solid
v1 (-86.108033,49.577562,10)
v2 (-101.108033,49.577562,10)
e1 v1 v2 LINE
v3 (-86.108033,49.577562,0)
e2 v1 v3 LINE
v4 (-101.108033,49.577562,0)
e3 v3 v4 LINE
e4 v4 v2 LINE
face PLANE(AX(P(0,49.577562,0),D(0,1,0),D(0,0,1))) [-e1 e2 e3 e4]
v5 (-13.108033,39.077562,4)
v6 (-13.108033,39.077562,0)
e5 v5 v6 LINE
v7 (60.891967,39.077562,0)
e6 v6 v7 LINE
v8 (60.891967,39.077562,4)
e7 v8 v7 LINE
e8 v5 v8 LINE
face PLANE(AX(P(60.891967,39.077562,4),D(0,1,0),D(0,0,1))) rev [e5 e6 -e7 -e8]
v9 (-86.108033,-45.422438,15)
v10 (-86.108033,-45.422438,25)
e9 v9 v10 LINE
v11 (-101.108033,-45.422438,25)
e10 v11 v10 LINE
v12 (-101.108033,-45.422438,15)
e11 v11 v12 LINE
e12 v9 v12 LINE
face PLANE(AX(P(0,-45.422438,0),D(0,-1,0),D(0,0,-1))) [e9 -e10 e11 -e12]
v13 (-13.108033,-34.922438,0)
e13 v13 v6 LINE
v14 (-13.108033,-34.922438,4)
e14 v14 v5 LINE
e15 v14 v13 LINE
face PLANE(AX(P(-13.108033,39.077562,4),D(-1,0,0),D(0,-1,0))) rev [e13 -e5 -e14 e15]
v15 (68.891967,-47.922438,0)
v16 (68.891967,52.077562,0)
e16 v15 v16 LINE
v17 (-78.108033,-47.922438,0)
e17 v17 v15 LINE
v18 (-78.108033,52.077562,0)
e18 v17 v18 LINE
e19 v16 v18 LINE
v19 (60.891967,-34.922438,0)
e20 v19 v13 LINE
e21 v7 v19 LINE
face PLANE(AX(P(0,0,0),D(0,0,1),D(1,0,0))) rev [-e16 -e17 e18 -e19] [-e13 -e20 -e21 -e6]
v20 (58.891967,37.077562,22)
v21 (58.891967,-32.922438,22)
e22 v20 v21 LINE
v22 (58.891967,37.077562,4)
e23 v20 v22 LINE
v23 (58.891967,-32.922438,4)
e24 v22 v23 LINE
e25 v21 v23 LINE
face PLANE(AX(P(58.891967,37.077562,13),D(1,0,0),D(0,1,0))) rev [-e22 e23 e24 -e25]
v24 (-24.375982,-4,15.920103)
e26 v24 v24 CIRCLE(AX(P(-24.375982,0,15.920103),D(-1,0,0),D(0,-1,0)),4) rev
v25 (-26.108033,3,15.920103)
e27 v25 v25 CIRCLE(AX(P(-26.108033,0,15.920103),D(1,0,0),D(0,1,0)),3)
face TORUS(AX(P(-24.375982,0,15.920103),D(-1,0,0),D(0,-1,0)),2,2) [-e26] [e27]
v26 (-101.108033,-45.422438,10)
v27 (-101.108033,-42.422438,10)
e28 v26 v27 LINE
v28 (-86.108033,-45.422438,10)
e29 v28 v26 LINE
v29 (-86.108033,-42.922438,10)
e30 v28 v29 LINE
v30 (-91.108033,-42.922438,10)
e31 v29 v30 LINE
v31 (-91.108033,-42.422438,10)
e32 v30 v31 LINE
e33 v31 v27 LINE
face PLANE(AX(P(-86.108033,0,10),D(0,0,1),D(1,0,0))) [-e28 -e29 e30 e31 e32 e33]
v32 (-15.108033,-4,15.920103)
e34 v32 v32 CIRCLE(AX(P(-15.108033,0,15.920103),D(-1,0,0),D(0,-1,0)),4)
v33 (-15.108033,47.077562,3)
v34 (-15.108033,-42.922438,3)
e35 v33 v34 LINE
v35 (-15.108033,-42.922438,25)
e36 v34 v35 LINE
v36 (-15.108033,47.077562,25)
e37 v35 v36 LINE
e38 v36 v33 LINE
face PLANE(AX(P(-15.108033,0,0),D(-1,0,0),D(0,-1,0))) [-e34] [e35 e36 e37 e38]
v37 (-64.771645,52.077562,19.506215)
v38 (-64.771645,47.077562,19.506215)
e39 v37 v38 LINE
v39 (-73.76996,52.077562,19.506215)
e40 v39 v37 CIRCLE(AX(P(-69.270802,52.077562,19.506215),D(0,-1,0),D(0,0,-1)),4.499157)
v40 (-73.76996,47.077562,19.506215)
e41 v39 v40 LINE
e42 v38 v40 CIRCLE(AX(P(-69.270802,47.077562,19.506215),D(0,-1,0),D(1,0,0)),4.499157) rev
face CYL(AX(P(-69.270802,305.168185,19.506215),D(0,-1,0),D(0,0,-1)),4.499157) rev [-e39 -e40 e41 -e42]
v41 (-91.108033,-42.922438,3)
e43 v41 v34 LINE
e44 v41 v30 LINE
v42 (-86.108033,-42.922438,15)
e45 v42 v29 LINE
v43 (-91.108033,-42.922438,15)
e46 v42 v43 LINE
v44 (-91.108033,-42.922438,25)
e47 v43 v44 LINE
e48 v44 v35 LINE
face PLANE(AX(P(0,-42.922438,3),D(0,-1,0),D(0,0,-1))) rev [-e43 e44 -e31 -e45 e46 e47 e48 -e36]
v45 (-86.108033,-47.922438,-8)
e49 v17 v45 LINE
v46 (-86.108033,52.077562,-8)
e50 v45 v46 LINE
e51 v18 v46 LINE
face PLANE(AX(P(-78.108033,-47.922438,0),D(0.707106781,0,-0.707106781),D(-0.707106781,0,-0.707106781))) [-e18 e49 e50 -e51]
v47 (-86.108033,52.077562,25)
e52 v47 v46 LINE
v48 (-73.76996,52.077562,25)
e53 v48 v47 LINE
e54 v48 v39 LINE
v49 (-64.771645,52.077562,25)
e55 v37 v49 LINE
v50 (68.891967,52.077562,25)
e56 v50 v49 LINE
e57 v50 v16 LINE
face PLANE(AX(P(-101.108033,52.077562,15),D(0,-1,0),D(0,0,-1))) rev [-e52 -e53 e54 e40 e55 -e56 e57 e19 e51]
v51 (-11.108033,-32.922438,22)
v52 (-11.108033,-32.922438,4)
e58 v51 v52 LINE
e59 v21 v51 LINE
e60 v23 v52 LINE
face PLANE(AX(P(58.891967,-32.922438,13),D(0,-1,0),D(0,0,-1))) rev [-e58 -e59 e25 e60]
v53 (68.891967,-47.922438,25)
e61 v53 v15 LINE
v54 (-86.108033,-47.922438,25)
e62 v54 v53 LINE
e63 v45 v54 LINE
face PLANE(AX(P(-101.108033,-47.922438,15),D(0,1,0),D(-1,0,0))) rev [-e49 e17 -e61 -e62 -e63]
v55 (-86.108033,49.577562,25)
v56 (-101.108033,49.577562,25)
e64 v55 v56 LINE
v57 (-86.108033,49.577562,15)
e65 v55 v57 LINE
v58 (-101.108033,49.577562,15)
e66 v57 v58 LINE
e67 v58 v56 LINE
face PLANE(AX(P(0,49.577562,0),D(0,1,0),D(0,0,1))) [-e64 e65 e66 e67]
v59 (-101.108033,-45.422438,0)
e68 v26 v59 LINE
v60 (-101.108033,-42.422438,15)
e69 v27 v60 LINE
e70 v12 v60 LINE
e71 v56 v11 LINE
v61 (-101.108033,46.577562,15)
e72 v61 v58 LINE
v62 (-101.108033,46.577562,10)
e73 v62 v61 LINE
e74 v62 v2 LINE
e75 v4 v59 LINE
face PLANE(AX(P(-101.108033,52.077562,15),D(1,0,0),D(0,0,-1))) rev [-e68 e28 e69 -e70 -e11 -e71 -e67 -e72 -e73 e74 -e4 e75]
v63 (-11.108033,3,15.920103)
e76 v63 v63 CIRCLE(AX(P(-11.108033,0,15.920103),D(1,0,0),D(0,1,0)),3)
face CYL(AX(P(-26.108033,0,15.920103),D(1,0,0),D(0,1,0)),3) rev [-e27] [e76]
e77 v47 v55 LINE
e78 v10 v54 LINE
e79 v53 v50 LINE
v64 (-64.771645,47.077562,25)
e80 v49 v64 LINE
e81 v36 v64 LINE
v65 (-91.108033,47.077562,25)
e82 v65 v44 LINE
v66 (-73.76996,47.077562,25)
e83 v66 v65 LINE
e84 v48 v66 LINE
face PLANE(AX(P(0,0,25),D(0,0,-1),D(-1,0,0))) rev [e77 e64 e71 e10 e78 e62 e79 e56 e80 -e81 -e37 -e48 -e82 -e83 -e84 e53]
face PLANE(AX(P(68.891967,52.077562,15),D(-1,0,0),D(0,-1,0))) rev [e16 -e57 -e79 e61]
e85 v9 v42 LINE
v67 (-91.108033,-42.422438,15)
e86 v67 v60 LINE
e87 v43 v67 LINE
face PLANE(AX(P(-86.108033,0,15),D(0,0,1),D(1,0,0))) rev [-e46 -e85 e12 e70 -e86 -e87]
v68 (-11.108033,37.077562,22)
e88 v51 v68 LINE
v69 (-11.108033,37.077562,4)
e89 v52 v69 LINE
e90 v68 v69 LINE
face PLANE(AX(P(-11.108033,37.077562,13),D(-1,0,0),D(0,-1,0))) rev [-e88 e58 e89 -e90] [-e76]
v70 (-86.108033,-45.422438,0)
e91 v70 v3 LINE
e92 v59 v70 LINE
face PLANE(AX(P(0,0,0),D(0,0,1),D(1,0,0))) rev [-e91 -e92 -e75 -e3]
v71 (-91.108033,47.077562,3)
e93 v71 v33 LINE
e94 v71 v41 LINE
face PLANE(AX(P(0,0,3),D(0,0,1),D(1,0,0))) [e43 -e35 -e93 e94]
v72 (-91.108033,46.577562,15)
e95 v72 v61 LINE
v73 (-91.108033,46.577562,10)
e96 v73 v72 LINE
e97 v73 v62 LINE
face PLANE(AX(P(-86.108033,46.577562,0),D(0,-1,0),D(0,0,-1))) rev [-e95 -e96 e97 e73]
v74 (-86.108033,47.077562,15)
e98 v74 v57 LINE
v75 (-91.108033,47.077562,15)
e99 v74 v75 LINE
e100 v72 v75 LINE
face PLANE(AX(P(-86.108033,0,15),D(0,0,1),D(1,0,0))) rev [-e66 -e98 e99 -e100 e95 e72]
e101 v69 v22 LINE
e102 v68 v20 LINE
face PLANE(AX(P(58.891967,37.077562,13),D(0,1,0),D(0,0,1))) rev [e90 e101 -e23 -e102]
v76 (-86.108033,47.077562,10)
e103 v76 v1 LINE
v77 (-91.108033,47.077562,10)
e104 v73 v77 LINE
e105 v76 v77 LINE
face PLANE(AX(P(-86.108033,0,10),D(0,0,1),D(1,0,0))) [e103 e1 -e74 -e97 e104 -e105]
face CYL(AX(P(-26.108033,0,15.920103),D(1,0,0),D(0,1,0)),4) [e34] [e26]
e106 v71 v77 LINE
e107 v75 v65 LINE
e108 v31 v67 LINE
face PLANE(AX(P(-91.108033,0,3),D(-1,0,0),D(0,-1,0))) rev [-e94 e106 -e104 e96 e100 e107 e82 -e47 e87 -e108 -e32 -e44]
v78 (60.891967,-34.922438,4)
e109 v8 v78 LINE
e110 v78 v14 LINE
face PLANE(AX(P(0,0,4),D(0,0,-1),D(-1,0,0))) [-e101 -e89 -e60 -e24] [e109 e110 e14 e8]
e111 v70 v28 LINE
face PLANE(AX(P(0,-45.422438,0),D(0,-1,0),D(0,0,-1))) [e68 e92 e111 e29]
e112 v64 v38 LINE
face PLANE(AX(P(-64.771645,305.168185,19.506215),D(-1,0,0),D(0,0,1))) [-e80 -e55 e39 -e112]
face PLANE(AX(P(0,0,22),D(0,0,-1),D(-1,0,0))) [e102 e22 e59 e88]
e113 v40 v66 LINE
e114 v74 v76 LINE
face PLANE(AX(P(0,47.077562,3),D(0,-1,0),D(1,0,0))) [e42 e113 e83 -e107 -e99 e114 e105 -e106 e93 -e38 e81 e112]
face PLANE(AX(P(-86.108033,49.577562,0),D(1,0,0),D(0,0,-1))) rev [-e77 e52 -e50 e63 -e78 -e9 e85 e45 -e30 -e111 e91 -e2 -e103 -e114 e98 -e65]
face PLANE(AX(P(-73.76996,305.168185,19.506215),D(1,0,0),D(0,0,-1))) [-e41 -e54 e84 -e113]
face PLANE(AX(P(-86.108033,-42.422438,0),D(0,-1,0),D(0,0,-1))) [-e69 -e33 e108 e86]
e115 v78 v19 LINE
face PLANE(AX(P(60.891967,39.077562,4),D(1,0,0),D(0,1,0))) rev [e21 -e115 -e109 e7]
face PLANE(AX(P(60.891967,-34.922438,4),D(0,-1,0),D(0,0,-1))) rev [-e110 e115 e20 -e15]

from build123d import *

# Parameters (mm, degrees)
SKETCH1_W                = 170
SKETCH1_H                = 100
BOSS_EXTRUDE1_DEPTH      = 15
SKETCH2_W                = 70
SKETCH2_H                = 70
CUT_EXTRUDE1_DEPTH       = 13
SKETCH3_W                = 70
SKETCH3_H                = 90
CUT_EXTRUDE2_DEPTH       = 12
SKETCH8_W                = 15
SKETCH8_H                = 15
CUT_EXTRUDE9_DEPTH       = 2.5
SKETCH9_W                = 15
SKETCH9_H                = 15
CUT_EXTRUDE10_DEPTH      = 2.5
SKETCH10_W               = 12
SKETCH10_H               = 90
CUT_EXTRUDE11_DEPTH      = 10
SKETCH11_W               = 80
SKETCH11_H               = 90
BOSS_EXTRUDE2_DEPTH      = 10
SKETCH12_W               = 22
SKETCH12_H               = 90
BOSS_EXTRUDE4_DEPTH      = 4
SKETCH2_2_W              = 70
SKETCH2_2_H              = 70
CUT_EXTRUDE12_DEPTH      = 22
SKETCH13_W               = 74
SKETCH13_H               = 74
SKETCH13_W_2             = 70
SKETCH13_H_2             = 70
CUT_EXTRUDE13_DEPTH      = 4
BOSS_EXTRUDE6_DEPTH      = 100
SKETCH15_W               = 5
SKETCH15_H               = 3
CUT_EXTRUDE14_DEPTH      = 15
SKETCH16_R               = 4
SKETCH16_R_2             = 3
BOSS_EXTRUDE7_DEPTH      = 15
SKETCH16_3_R             = 3
CUT_EXTRUDE15_DEPTH      = 15
FILLET1_R                = 2
CUT_EXTRUDE16_DEPTH      = 145.387791679
CUT_EXTRUDE16_DEPTH_BACK = 15


with BuildPart() as part:
    # Sketch1 → Boss-Extrude1 (new body)
    with BuildSketch(Plane.XY):
        with Locations((-16.108033241, 2.077562327)):
            Rectangle(SKETCH1_W, SKETCH1_H)
    extrude(amount=BOSS_EXTRUDE1_DEPTH)

    # Sketch2 → Cut-Extrude1 (cut)
    with BuildSketch(Plane(origin=(0, 0, 0), x_dir=(-1, 0, 0), z_dir=(0, 0, -1))):
        with Locations((-23.891966759, 2.077562327)):
            Rectangle(SKETCH2_W, SKETCH2_H)
    extrude(amount=-CUT_EXTRUDE1_DEPTH, mode=Mode.SUBTRACT)

    # Sketch3 → Cut-Extrude2 (cut)
    with BuildSketch(Plane.XY.offset(15)):
        with Locations((-56.108033241, 2.077562327)):
            Rectangle(SKETCH3_W, SKETCH3_H)
    extrude(amount=-CUT_EXTRUDE2_DEPTH, mode=Mode.SUBTRACT)

    # Sketch8 → Cut-Extrude9 (cut)
    with BuildSketch(Plane(origin=(0, 52.077562327, 0), x_dir=(1, 0, 0), z_dir=(0, 1, 0))):
        with Locations((-93.608033241, -7.5)):
            Rectangle(SKETCH8_W, SKETCH8_H)
    extrude(amount=-CUT_EXTRUDE9_DEPTH, mode=Mode.SUBTRACT)

    # Sketch9 → Cut-Extrude10 (cut)
    with BuildSketch(Plane.XZ.offset(47.922437673)):
        with Locations((-93.608033241, 7.5)):
            Rectangle(SKETCH9_W, SKETCH9_H)
    extrude(amount=-CUT_EXTRUDE10_DEPTH, mode=Mode.SUBTRACT)

    # Sketch10 → Cut-Extrude11 (cut)
    with BuildSketch(Plane.ZY.offset(21.108033241)):
        with Locations((9, 2.077562327)):
            Rectangle(SKETCH10_W, SKETCH10_H)
    extrude(amount=-CUT_EXTRUDE11_DEPTH, mode=Mode.SUBTRACT)

    # Sketch11 → Boss-Extrude2 (add)
    with BuildSketch(Plane.XY.offset(15)):
        Polygon((-86.108033241, -45.422437673), (-86.108033241, -47.922437673), (68.891966759, -47.922437673), (68.891966759, 52.077562327), (-86.108033241, 52.077562327), (-86.108033241, 49.577562327), (-101.108033241, 49.577562327), (-101.108033241, -45.422437673), align=None)
        with Locations((-51.108033241, 2.077562327)):
            Rectangle(SKETCH11_W, SKETCH11_H, mode=Mode.SUBTRACT)
    extrude(amount=BOSS_EXTRUDE2_DEPTH)

    # Sketch12 → Boss-Extrude4 (add)
    with BuildSketch(Plane.ZY.offset(11.108033241)):
        with Locations((14, 2.077562327)):
            Rectangle(SKETCH12_W, SKETCH12_H)
    extrude(amount=BOSS_EXTRUDE4_DEPTH)

    # Sketch2<2> → Cut-Extrude12 (cut)
    with BuildSketch(Plane(origin=(0, 0, 0), x_dir=(-1, 0, 0), z_dir=(0, 0, -1))):
        with Locations((-23.891966759, 2.077562327)):
            Rectangle(SKETCH2_2_W, SKETCH2_2_H)
    extrude(amount=-CUT_EXTRUDE12_DEPTH, mode=Mode.SUBTRACT)

    # Sketch13 → Cut-Extrude13 (cut)
    with BuildSketch(Plane(origin=(0, 0, 0), x_dir=(-1, 0, 0), z_dir=(0, 0, -1))):
        with Locations((-23.891966759, 2.077562327)):
            Rectangle(SKETCH13_W, SKETCH13_H)
        with Locations((-23.891966759, 2.077562327)):
            Rectangle(SKETCH13_W_2, SKETCH13_H_2, mode=Mode.SUBTRACT)
    extrude(amount=-CUT_EXTRUDE13_DEPTH, mode=Mode.SUBTRACT)

    # Sketch14 → Boss-Extrude6 (add)
    with BuildSketch(Plane(origin=(0, 52.077562327, 0), x_dir=(1, 0, 0), z_dir=(0, 1, 0))):
        Polygon((-86.108033241, 0), (-78.108033241, 0), (-86.108033241, 8), align=None)
    extrude(amount=-BOSS_EXTRUDE6_DEPTH)

    # Sketch15 → Cut-Extrude14 (cut)
    with BuildSketch(Plane.ZY.offset(101.108033241)):
        with Locations((12.5, 48.077562327)):
            Rectangle(SKETCH15_W, SKETCH15_H)
        with Locations((12.5, -43.922437673)):
            Rectangle(SKETCH15_W, SKETCH15_H)
    extrude(amount=-CUT_EXTRUDE14_DEPTH, mode=Mode.SUBTRACT)

    # Sketch16 → Boss-Extrude7 (add)
    with BuildSketch(Plane(origin=(-11.108033241, 0, 0), x_dir=(0, 0, -1), z_dir=(1, 0, 0))):
        with Locations(Location((-15.920102605, 0, 0), (0, 0, 90))):
            Circle(SKETCH16_R)
        with Locations(Location((-15.920102605, 0, 0), (0, 0, 90))):
            Circle(SKETCH16_R_2, mode=Mode.SUBTRACT)
    extrude(amount=-BOSS_EXTRUDE7_DEPTH)

    # Sketch16<3> → Cut-Extrude15 (cut)
    with BuildSketch(Plane(origin=(-11.108033241, 0, 0), x_dir=(0, 0, -1), z_dir=(1, 0, 0))):
        with Locations(Location((-15.920102605, 0, 0), (0, 0, 90))):
            Circle(SKETCH16_3_R)
    extrude(amount=-CUT_EXTRUDE15_DEPTH, mode=Mode.SUBTRACT)

    # Fillet1
    # the kernel refuses this fillet: 2 mm, written as the material it takes off along each edge
    with BuildSketch(Plane(origin=(-26.108033241, 0, 15.920102605), x_dir=(0, 1, 0), z_dir=(0, 0, -1))) as fillet1_piece_1:
        with BuildLine():
            CenterArc((2, 1.732050808), FILLET1_R, 300, 60)
            Line((3, 0), (3.02, -0.034641016))
            ThreePointArc((3.02, -0.034641016), (3.5, -0.04), (4, -0.04))
            Line((4, -0.04), (4.04, 0))
            Line((4.04, 0), (4.04, 1.732050808))
            Line((4.04, 1.732050808), (4, 1.732050808))
        make_face()
    revolve(axis=Axis((-26.108033241, 0, 15.920102605), (1, 0, 0)), mode=Mode.SUBTRACT)

    # Sketch17 → Cut-Extrude16 (cut, two sides: drawn at the far end of the back side and taken through both)
    with BuildSketch(Plane(origin=(0, 52.077562327, 0), x_dir=(1, 0, 0), z_dir=(0, 1, 0)).offset(-CUT_EXTRUDE16_DEPTH_BACK)):
        with BuildLine():
            Line((-64.771644572, -25), (-64.771644572, -19.506214928))
            ThreePointArc((-64.771644572, -19.506214928), (-69.270802051, -15.007057449), (-73.76995953, -19.506214928))
            Line((-73.76995953, -19.506214928), (-73.76995953, -25))
            Line((-73.76995953, -25), (-64.771644572, -25))
        make_face()
    extrude(amount=CUT_EXTRUDE16_DEPTH + CUT_EXTRUDE16_DEPTH_BACK, mode=Mode.SUBTRACT)


solid = part.part
